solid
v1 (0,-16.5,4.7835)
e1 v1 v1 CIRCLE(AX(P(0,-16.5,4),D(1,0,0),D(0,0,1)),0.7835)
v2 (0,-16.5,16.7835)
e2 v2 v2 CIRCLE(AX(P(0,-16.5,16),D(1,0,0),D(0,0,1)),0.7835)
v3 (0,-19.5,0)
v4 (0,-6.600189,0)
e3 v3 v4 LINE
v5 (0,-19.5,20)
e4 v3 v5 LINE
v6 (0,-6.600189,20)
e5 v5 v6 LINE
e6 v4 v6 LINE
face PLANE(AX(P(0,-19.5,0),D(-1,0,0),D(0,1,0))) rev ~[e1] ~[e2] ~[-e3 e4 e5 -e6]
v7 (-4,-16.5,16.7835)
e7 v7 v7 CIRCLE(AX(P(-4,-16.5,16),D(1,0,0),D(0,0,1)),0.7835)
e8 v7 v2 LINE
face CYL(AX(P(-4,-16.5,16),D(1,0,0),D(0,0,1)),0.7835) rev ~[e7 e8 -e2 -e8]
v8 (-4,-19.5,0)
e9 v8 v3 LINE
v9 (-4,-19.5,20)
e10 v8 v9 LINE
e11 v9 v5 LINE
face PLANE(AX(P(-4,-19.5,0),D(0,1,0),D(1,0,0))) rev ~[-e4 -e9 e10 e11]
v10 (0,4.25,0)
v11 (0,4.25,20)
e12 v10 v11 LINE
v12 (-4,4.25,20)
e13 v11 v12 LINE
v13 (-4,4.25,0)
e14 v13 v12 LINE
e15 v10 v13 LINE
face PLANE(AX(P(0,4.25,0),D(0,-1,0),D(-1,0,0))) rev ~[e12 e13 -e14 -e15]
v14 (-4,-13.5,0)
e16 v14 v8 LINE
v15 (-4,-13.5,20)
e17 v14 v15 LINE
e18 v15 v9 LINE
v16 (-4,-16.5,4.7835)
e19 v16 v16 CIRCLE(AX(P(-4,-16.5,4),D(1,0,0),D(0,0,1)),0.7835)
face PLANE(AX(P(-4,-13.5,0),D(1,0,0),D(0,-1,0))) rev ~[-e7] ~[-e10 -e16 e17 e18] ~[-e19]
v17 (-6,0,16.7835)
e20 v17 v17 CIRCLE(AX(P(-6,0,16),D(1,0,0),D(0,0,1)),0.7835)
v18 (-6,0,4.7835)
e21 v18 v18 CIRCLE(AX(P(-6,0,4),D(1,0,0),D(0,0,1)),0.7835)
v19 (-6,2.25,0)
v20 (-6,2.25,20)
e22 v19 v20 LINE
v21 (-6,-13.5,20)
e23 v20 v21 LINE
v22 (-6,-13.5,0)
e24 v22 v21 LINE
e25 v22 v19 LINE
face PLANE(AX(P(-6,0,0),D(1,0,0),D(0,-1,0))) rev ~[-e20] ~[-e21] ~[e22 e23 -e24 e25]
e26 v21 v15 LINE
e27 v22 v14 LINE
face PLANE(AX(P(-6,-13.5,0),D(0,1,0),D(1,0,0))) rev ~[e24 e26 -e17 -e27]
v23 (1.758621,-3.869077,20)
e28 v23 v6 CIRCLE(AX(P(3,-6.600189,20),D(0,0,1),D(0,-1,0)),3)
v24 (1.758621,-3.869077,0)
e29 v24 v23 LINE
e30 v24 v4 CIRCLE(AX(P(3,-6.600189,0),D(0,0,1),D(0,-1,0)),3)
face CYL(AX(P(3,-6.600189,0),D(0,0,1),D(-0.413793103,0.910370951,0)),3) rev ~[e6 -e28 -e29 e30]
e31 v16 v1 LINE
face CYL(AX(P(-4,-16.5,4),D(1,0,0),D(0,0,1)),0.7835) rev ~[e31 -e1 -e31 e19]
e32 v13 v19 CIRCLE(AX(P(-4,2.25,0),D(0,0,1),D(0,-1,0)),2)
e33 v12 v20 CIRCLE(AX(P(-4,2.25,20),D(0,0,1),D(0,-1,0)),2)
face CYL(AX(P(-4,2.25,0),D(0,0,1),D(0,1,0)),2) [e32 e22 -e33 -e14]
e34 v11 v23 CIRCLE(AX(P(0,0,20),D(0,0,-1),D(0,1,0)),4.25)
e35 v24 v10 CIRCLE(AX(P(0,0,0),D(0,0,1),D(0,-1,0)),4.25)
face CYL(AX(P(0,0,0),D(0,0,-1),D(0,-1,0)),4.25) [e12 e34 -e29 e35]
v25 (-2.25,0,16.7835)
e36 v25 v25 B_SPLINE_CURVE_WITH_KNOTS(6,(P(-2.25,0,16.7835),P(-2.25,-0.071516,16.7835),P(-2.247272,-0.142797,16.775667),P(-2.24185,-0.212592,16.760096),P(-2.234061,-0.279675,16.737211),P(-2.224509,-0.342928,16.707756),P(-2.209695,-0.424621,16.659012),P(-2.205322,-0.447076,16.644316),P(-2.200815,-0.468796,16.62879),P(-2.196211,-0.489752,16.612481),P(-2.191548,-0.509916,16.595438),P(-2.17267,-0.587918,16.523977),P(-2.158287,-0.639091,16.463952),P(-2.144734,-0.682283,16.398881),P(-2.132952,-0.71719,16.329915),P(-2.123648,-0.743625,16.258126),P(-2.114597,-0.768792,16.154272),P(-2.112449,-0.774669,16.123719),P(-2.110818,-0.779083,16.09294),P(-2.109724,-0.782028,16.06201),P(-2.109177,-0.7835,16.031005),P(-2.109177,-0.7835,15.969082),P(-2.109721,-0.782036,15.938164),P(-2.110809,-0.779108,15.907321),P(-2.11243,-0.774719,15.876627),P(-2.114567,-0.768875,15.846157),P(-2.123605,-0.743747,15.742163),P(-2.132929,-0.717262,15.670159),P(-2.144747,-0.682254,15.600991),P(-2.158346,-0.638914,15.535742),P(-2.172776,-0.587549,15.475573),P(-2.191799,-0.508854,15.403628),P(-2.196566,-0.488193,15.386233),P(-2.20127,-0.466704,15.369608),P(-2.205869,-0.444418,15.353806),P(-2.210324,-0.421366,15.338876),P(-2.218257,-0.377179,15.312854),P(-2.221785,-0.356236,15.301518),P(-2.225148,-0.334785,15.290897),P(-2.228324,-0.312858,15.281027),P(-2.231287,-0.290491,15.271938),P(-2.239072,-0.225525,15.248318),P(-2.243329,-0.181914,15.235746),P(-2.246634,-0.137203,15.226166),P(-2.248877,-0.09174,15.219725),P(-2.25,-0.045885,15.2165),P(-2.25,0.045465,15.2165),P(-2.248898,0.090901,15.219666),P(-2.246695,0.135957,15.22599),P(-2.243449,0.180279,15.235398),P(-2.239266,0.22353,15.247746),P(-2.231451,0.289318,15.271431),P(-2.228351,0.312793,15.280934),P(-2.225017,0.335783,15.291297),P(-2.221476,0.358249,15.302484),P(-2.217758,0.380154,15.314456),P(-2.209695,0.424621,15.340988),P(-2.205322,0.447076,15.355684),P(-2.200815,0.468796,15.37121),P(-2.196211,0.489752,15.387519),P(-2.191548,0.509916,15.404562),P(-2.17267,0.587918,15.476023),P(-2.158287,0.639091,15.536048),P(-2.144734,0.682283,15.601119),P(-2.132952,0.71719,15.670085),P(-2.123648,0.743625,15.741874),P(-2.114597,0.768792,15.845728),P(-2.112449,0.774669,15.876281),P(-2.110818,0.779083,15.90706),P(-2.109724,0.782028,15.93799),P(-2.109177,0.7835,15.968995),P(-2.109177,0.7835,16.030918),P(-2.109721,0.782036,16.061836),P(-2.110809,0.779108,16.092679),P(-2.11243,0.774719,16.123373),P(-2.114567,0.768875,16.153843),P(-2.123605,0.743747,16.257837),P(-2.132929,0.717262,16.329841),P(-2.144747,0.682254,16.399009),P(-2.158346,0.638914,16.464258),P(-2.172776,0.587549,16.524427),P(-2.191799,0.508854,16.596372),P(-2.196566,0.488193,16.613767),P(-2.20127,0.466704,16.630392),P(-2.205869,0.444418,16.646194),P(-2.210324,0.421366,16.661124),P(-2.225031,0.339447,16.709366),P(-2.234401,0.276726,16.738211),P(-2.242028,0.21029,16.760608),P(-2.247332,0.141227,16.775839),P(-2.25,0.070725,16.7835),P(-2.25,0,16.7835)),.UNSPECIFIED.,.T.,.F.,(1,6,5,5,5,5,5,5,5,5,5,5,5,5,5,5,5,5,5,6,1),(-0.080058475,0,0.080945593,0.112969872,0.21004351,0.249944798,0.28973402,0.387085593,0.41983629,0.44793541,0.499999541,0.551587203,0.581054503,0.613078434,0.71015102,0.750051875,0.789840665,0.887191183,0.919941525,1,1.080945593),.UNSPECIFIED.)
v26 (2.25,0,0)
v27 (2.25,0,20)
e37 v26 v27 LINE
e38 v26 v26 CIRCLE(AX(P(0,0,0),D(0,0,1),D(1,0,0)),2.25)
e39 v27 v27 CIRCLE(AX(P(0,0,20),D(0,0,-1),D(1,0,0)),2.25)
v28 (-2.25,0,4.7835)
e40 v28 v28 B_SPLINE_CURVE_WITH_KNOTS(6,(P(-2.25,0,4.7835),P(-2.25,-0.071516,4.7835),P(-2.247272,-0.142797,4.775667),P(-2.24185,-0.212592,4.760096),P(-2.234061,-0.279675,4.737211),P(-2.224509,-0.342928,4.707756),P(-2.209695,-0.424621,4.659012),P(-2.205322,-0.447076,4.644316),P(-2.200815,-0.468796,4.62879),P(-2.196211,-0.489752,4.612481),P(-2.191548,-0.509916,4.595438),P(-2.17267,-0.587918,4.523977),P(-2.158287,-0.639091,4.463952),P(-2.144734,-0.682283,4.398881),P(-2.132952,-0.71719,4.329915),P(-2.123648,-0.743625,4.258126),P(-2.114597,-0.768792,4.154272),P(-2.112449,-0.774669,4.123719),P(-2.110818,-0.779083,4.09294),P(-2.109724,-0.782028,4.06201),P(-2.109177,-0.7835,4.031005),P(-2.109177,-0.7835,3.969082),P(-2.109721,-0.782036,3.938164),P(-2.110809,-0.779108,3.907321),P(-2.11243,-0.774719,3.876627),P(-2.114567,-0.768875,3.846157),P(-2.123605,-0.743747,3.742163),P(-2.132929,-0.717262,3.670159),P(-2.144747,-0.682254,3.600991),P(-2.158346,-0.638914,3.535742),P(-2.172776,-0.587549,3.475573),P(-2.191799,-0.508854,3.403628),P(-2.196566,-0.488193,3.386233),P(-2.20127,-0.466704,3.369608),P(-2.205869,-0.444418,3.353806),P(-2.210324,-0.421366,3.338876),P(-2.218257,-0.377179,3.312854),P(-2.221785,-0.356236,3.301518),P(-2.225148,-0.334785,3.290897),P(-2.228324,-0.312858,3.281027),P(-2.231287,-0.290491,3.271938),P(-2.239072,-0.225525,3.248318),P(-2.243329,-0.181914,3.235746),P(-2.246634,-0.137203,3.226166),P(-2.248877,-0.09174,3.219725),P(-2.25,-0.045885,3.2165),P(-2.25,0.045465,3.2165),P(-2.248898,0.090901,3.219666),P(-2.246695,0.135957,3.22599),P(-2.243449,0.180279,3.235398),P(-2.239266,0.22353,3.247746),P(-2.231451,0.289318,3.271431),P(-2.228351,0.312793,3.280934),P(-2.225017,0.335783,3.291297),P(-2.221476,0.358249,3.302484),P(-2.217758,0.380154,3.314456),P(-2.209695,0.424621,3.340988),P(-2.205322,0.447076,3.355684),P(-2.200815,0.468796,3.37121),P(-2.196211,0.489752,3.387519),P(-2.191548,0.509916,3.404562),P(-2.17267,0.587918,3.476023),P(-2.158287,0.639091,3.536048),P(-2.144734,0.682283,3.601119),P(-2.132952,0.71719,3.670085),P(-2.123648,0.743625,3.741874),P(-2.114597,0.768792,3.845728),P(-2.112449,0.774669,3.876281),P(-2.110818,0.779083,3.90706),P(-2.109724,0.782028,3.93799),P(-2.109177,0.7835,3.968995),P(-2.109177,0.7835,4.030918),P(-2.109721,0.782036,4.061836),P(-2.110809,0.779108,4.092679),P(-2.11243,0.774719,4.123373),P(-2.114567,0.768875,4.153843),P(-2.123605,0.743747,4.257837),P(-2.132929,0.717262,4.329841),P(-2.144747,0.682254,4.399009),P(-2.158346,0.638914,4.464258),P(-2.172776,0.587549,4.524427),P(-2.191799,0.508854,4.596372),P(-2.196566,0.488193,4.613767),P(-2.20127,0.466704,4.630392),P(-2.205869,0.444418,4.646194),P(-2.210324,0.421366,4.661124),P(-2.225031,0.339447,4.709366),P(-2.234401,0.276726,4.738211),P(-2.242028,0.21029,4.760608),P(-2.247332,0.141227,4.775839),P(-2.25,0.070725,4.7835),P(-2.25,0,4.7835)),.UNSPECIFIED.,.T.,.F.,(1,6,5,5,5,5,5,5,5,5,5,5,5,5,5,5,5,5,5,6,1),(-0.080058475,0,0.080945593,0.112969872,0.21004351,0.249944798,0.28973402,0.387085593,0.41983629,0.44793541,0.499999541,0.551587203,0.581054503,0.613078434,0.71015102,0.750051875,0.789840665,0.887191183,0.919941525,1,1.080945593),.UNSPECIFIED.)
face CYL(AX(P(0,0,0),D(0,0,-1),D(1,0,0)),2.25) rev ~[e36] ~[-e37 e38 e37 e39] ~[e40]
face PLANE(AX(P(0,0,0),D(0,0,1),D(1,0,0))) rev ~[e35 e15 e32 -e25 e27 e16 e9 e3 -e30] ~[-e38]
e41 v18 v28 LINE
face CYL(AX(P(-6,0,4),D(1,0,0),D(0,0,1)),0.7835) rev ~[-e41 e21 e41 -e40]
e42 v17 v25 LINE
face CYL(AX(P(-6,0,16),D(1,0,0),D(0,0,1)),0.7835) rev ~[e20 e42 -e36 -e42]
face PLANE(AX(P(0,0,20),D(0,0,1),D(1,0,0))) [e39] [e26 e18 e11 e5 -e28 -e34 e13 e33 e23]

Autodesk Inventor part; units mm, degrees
ref_plane "YZ Plane" through (0, 0, 0) normal (1, 0, 0) x (0, 1, 0)
ref_plane "XZ Plane" through (0, 0, 0) normal (0, 1, 0) x (-1, 0, 0)
ref_plane "XY Plane" through (0, 0, 0) normal (0, 0, 1) x (1, 0, 0)
sketch "Skizze1" plane through (0, 0, 0) normal (0, 0, 1) x (1, 0, 0)
  circle A0 centre (0, 0) radius 2.25
  line L0 (0, 4.25) -> (-6, 4.25)
  line L1 (-6, 4.25) -> (-6, -13.5)
  line L2 (-6, -13.5) -> (-4, -13.5)
  line L3 (-4, -13.5) -> (-4, -19.5)
  line L4 (-4, -19.5) -> (0, -19.5)
  line L5 (0, -19.5) -> (0, -4.25)
  arc A1 (0, -4.25) -> (0, 4.25) centre (0, 0) ccw
  line L6 (0, 9) -> (0, -24.25) projected
  line L7 (-8.05, 0) -> (6.3, 0) projected
  dimension "d0" = 4.5
  dimension "d1" = 4
  dimension "d2" = 2
  dimension "d3" = 2
  dimension "d4" = 13.5
  dimension "d5" = 6
extrude "Extrusion1" add sketch "Skizze1" along normal blind 20 contours L7 A1 L6 A0 | A0 L6 A1 L7 | A0 L7 L1 L0 L6 | L6 L5 L4 L3 L2 L1 L7 A0
sketch "Skizze2" plane through (-6, -13.5, 0) normal (-1, 0, 0) x (0, 0, 1)
  line L0 (20, 0) -> (20, 17.75) projected
  line L1 (0, 17.75) -> (0, 0) projected
  line L2 (0, 15.75) -> (20, 15.75) projected
  line L3 (0, 11.25) -> (20, 11.25) projected
  point P0 (0, 13.5)
  point P1 (4, 13.5)
  point P2 (16, 13.5)
  dimension "d8" = 4
  dimension "d9" = 4
hole "Bohrung1" at (-6, 0, 4) at (-6, 0, 16) direction (1, 0, 0) diameter 1.567 end up to surface thread size "M2x0.4" class "6H" standard "ISO Metric profile"
sketch "Skizze3" plane through (-4, -19.5, 0) normal (-1, 0, 0) x (0, 0, 1)
  line L0 (20, 0) -> (20, 6) projected
  line L1 (0, 6) -> (0, 0) projected
  point P0 (0, 19.5)
  point P1 (4, 3)
  point P2 (16, 3)
  dimension "d17" = 4
  dimension "d18" = 4
hole "Bohrung2" at (-4, -16.5, 4) at (-4, -16.5, 16) direction (1, 0, 0) diameter 1.567 end up to surface thread size "M2x0.4" class "6H" standard "ISO Metric profile"
fillet "Rundung1" radius 2 1 edges at (-6, 4.25, 10)
fillet "Rundung2" radius 3 1 edges at (0, -4.25, 10)
equation "\"d9\" = d8"
equation "\"d18\" = d17"
properties part number "Türarm"
